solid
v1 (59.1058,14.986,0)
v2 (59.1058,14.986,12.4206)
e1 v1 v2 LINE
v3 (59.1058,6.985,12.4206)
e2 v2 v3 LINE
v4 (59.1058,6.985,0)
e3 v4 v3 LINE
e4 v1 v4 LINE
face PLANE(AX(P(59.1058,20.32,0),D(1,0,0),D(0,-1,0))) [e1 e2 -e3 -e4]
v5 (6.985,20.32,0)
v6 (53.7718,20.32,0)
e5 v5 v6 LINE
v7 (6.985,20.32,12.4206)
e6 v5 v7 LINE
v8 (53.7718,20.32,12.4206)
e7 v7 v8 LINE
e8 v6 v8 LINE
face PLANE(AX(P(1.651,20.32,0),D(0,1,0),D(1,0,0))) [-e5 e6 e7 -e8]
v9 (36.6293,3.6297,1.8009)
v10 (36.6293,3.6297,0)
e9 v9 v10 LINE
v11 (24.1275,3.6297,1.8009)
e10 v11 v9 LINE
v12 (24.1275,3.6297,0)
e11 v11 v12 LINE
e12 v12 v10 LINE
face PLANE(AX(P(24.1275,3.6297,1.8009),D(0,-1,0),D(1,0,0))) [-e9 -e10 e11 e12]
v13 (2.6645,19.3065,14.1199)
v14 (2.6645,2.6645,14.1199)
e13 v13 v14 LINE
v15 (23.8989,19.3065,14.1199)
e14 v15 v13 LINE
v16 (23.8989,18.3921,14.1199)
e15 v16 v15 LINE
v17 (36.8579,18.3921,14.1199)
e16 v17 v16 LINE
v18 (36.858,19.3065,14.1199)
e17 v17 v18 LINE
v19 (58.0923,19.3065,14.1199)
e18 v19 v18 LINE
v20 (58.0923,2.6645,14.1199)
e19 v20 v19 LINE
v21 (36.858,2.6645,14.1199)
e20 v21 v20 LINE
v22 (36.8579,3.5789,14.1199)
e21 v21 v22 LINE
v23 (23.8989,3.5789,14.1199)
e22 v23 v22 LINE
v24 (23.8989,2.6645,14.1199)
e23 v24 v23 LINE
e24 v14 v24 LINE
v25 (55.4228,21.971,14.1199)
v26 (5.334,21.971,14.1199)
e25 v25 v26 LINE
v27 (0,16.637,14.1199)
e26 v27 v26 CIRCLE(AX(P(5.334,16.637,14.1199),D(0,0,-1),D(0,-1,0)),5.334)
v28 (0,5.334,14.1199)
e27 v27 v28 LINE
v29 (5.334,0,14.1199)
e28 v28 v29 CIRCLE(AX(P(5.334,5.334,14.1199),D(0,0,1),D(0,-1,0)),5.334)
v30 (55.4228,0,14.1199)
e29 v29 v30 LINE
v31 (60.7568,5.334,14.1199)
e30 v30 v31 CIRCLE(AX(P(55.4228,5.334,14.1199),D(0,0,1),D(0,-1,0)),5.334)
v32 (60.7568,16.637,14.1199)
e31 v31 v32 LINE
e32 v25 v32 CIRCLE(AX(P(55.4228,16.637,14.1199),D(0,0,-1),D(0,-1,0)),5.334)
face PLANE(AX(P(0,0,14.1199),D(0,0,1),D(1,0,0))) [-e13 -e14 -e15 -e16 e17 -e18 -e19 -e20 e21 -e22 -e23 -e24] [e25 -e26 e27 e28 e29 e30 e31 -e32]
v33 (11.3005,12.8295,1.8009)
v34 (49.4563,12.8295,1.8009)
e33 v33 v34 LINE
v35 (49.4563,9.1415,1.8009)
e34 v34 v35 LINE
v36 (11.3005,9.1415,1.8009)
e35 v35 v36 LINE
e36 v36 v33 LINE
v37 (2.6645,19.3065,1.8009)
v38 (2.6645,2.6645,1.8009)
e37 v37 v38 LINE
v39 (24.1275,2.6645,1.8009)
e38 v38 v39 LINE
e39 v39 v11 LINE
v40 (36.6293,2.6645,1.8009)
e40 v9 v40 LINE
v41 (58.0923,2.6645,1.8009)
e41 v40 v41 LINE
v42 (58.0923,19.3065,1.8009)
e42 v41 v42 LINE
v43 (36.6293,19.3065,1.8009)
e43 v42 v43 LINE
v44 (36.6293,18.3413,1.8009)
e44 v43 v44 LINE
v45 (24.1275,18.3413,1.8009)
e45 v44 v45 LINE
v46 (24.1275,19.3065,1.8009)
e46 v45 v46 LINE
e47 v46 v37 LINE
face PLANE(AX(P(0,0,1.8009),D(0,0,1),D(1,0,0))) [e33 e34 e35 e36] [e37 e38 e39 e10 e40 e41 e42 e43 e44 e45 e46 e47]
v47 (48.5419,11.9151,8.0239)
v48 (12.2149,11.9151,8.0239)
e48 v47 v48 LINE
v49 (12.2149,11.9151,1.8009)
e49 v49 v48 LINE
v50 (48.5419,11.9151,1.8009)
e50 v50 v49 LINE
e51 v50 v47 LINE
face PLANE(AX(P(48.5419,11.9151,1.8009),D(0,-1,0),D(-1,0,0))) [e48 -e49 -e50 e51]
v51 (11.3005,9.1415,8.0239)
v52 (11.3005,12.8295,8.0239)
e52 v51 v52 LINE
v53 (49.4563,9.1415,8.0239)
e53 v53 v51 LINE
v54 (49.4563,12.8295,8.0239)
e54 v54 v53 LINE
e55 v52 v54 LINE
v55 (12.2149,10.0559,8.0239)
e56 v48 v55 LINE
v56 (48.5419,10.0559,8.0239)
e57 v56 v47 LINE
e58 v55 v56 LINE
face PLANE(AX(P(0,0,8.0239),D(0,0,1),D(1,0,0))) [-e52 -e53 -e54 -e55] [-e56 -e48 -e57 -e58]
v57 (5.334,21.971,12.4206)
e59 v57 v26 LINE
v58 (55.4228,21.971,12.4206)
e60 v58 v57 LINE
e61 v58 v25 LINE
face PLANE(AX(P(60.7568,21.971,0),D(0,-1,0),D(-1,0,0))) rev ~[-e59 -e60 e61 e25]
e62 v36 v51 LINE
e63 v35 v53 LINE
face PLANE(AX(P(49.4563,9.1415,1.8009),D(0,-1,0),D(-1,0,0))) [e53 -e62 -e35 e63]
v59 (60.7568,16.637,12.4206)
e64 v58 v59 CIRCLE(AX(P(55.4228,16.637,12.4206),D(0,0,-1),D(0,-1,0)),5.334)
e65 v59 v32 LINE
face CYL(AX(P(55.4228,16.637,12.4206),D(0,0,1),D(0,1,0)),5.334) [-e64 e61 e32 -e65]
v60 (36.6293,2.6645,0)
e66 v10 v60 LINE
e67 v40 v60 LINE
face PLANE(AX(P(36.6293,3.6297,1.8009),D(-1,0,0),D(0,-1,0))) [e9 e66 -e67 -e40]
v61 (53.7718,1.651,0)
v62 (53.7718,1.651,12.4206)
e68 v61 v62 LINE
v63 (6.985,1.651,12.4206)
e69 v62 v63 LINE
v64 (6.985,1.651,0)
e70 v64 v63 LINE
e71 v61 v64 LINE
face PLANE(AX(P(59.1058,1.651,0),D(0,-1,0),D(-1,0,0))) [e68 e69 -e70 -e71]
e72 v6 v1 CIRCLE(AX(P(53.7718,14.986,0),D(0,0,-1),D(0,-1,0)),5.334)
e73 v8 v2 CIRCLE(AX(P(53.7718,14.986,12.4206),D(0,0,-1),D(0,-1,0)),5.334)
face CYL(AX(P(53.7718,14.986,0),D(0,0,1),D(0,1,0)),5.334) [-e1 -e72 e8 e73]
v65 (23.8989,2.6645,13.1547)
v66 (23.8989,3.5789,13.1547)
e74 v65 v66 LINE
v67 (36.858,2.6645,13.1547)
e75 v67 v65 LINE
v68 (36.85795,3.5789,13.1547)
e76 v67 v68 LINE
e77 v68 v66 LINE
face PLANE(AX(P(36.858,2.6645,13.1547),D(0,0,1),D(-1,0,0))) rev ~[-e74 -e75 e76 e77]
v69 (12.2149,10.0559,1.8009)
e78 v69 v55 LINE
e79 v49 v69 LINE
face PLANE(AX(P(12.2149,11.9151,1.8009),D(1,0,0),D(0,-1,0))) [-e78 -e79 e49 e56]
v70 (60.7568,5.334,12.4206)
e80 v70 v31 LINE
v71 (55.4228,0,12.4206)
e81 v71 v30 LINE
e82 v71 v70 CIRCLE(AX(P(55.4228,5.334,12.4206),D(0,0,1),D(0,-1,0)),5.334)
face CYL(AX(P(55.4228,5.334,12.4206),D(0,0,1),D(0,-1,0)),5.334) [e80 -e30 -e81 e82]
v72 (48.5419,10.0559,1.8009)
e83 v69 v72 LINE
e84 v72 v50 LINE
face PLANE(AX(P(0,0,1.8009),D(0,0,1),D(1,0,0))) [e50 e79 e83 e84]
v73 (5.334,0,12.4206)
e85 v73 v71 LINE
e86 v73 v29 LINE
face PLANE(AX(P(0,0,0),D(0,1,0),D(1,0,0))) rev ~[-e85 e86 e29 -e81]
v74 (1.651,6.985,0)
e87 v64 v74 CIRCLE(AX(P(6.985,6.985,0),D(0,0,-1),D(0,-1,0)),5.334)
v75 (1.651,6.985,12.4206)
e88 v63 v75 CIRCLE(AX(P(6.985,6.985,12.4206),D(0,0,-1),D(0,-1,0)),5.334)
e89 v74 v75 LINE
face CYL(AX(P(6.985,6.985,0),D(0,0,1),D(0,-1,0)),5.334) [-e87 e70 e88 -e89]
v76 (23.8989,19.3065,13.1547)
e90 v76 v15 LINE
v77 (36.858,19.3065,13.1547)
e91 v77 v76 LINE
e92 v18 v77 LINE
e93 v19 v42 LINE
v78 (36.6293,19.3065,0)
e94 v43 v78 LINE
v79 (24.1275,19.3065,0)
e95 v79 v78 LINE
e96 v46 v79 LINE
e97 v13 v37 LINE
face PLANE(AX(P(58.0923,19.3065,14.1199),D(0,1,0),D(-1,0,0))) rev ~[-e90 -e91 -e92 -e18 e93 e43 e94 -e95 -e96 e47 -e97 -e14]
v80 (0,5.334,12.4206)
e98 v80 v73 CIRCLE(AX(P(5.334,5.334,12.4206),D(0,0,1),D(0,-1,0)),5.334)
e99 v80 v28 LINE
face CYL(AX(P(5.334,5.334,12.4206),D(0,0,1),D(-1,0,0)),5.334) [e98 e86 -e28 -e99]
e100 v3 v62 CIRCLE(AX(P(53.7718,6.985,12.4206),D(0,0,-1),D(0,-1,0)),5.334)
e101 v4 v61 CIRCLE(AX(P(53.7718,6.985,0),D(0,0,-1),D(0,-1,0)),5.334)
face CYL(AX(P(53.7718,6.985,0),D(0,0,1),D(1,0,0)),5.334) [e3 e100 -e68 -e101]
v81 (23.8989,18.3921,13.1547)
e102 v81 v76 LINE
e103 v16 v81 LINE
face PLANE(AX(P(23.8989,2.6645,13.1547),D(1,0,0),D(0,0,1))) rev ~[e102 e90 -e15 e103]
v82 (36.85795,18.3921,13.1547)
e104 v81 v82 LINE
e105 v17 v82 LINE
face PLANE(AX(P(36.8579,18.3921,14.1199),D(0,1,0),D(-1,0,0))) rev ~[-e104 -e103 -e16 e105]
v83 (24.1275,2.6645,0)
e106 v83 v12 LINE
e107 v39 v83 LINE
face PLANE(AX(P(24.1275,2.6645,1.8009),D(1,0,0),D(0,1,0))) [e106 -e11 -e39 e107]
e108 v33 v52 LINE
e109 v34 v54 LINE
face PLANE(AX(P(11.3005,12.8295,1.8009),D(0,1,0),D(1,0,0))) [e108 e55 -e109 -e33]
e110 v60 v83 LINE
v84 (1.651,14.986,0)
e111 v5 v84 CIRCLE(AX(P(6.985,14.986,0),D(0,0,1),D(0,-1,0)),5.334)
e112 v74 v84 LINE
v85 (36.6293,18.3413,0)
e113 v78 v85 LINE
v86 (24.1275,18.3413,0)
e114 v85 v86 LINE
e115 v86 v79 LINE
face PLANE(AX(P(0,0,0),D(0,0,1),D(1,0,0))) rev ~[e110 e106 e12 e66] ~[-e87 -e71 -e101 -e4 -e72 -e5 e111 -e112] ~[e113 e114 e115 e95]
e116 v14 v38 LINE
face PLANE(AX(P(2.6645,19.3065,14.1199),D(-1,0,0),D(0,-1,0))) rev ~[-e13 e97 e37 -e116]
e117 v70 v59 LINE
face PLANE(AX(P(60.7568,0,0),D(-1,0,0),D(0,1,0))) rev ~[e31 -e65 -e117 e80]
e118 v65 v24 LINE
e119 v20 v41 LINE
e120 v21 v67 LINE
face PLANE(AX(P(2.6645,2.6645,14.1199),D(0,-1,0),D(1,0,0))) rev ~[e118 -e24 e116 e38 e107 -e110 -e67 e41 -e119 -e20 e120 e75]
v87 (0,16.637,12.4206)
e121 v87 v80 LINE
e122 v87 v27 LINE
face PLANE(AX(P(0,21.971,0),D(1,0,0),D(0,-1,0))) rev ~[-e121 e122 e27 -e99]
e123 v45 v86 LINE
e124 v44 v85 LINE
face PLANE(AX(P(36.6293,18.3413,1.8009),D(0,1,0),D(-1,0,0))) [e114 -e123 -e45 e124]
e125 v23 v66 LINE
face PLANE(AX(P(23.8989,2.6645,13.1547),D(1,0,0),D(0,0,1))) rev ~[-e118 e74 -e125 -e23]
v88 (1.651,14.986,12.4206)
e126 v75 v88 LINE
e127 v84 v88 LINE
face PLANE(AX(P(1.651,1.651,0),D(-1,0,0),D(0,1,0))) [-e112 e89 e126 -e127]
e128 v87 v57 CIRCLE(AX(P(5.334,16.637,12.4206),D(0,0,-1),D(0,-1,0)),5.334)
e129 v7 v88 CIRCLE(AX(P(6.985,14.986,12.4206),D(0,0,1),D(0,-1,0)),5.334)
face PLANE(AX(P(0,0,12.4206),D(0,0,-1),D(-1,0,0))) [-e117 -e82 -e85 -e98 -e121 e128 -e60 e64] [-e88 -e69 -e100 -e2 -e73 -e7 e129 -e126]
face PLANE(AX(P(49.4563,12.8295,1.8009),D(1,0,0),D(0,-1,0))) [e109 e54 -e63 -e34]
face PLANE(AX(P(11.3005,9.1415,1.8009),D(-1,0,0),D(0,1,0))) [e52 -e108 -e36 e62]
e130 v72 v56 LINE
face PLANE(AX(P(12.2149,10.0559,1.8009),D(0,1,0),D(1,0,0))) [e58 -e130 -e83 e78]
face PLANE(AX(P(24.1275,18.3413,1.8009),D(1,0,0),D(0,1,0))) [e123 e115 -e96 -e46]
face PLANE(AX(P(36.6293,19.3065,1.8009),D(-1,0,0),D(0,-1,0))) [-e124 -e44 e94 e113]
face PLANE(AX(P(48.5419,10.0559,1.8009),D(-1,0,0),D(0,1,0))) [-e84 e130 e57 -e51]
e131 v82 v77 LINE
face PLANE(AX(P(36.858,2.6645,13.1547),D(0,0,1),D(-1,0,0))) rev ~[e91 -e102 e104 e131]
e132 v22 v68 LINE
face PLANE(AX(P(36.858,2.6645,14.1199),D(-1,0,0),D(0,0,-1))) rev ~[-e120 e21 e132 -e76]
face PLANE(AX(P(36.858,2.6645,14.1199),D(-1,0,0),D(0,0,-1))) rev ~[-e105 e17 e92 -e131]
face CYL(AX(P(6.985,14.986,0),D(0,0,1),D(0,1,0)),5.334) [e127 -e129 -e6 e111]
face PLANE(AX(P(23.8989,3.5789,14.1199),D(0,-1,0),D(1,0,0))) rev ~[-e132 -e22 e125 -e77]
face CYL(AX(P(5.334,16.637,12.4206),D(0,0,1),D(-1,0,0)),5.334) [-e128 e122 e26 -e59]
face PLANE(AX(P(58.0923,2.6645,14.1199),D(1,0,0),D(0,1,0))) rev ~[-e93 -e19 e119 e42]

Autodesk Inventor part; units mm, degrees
ref_plane "YZ Plane" through (0, 0, 0) normal (1, 0, 0) x (0, 1, 0)
ref_plane "XZ Plane" through (0, 0, 0) normal (0, 1, 0) x (-1, 0, 0)
ref_plane "XY Plane" through (0, 0, 0) normal (0, 0, 1) x (1, 0, 0)
sketch "Sketch1" plane through (0, 0, 0) normal (0, 0, 1) x (1, 0, 0)
  line L0 (0, 0) -> (60.7568, 0)
  line L1 (60.7568, 0) -> (60.7568, 21.971)
  line L2 (60.7568, 21.971) -> (0, 21.971)
  line L3 (0, 21.971) -> (0, 0)
  dimension "d0" = 60.7568
  dimension "d1" = 21.971
extrude "Extrusion1" add sketch "Sketch1" along normal blind 14.1199
sketch "Sketch2" plane through (0, 0, 14.1199) normal (0, 0, 1) x (1, 0, 0)
  line L0 (0, 21.971) -> (60.7568, 21.971) construction
  line L1 (60.7568, 21.971) -> (60.7568, 0) construction
  line L2 (60.7568, 0) -> (0, 0) construction
  line L3 (0, 0) -> (0, 21.971) construction
  line L4 (58.0923, 19.3065) -> (2.6645, 19.3065)
  line L5 (2.6645, 19.3065) -> (2.6645, 2.6645)
  line L6 (2.6645, 2.6645) -> (58.0923, 2.6645)
  line L7 (58.0923, 2.6645) -> (58.0923, 19.3065)
  point P0 (0, 0)
  dimension "d4" = 2.6645
extrude "Extrusion2" cut sketch "Sketch2" against normal blind 12.319
sketch "Sketch3" plane through (0, 0, 0) normal (0, 0, -1) x (-1, 0, 0)
  line L0 (-60.7568, 21.971) -> (0, 21.971)
  line L1 (0, 21.971) -> (0, 0)
  line L2 (0, 0) -> (-60.7568, 0)
  line L3 (-60.7568, 0) -> (-60.7568, 21.971)
  line L4 (-1.651, 20.32) -> (-59.1058, 20.32)
  line L5 (-59.1058, 20.32) -> (-59.1058, 1.651)
  line L6 (-59.1058, 1.651) -> (-1.651, 1.651)
  line L7 (-1.651, 1.651) -> (-1.651, 20.32)
  dimension "d7" = 1.651
extrude "Extrusion3" cut sketch "Sketch3" against normal blind 12.4206
fillet "Fillet1" radius 5.334 8 edges at (0, 21.971, 13.2702) (60.7568, 21.971, 13.2702) (60.7568, 0, 13.2702) (0, 0, 13.2702) (1.651, 20.32, 6.2103) (59.1058, 20.32, 6.2103) (59.1058, 1.651, 6.2103) (1.651, 1.651, 6.2103)
sketch "Sketch4" plane through (0, 0, 1.8009) normal (0, 0, 1) x (1, 0, 0)
  line L0 (11.3005, 12.8295) -> (49.4563, 12.8295)
  line L1 (49.4563, 12.8295) -> (49.4563, 9.1415)
  line L2 (49.4563, 9.1415) -> (11.3005, 9.1415)
  line L3 (11.3005, 9.1415) -> (11.3005, 12.8295)
  line L4 (2.6645, 2.6645) -> (2.6645, 19.3065) projected
  line L5 (58.0923, 19.3065) -> (58.0923, 2.6645) projected
  line L6 (2.6645, 19.3065) -> (58.0923, 19.3065) projected
  line L7 (58.0923, 2.6645) -> (2.6645, 2.6645) projected
  line L8 (48.5419, 11.9151) -> (12.2149, 11.9151)
  line L9 (12.2149, 11.9151) -> (12.2149, 10.0559)
  line L10 (12.2149, 10.0559) -> (48.5419, 10.0559)
  line L11 (48.5419, 10.0559) -> (48.5419, 11.9151)
  point P0 (0, 0)
  dimension "d12" = 8.636
  dimension "d13" = 8.636
  dimension "d14" = 6.477
  dimension "d15" = 6.477
  dimension "d16" = 0.9144
extrude "Extrusion4" add sketch "Sketch4" along normal blind 6.223 contours L0 L1 L2 L3
sketch "Sketch5" plane through (0, 0, 1.8009) normal (0, 0, 1) x (1, 0, 0)
  line L0 (58.0923, 2.6645) -> (2.6645, 2.6645) projected
  line L1 (24.1275, 3.6297) -> (36.6293, 3.6297)
  line L2 (36.6293, 3.6297) -> (36.6293, 2.6645)
  line L3 (36.6293, 2.6645) -> (24.1275, 2.6645)
  line L4 (24.1275, 2.6645) -> (24.1275, 3.6297)
  line L5 (2.6645, 19.3065) -> (58.0923, 19.3065) projected
  line L6 (24.1275, 19.3065) -> (36.6293, 19.3065)
  line L7 (36.6293, 19.3065) -> (36.6293, 18.3413)
  line L8 (36.6293, 18.3413) -> (24.1275, 18.3413)
  line L9 (24.1275, 18.3413) -> (24.1275, 19.3065)
  line L10 (2.6645, 2.6645) -> (2.6645, 19.3065) projected
  line L11 (58.0923, 19.3065) -> (58.0923, 2.6645) projected
  point P0 (0, 0)
  dimension "d19" = 21.463
  dimension "d20" = 21.463
  dimension "d21" = 21.463
  dimension "d22" = 21.463
  dimension "d23" = 0.9652
  dimension "d24" = 0.9652
extrude "Extrusion5" cut sketch "Sketch5" against normal blind 6.223 contours L0 L4 L1 L2 | L7 L8 L9 L5
sketch "Sketch6" plane through (2.6645, 2.6645, 14.1199) normal (0, 1, 0) x (1, 0, 0)
  line L0 (55.4279, 0) -> (0, 0) construction
  line L1 (21.2344, 0) -> (34.1935, 0)
  line L2 (34.1935, 0) -> (34.1935, 0.9652)
  line L3 (34.1935, 0.9652) -> (21.2344, 0.9652)
  line L4 (21.2344, 0.9652) -> (21.2344, 0)
  line L5 (0, 0) -> (0, 12.319) construction
  line L6 (55.4279, 0) -> (55.4279, 12.319) construction
  point P0 (-2.6645, 14.1199)
  dimension "d27" = 21.2344
  dimension "d28" = 21.2344
  dimension "d29" = 0.9652
extrude "Extrusion6" add sketch "Sketch6" along normal up to next
sketch "Sketch7" plane through (0, 0, 14.1199) normal (0, 0, 1) x (1, 0, 0)
  line L0 (23.8989, 2.6645) -> (23.8989, 19.3065) projected
  line L1 (36.8579, 2.6645) -> (36.8579, 19.3065) projected
  line L2 (23.8989, 3.5789) -> (36.8579, 3.5789)
  line L3 (36.8579, 3.5789) -> (36.8579, 18.3921)
  line L4 (36.8579, 18.3921) -> (23.8989, 18.3921)
  line L5 (23.8989, 18.3921) -> (23.8989, 3.5789)
  line L6 (36.8579, 19.3065) -> (58.0923, 19.3065) projected
  line L7 (58.0923, 2.6645) -> (36.8579, 2.6645) projected
  point P0 (0, 0)
  dimension "d32" = 0.9144
  dimension "d33" = 0.9144
extrude "Extrusion7" cut sketch "Sketch7" against normal up to next
equation "\"d13\" = d12"
equation "\"d15\" = d14"
equation "\"d20\" = d19"
equation "\"d21\" = d19"
equation "\"d22\" = d20"
equation "\"d24\" = d23"
equation "\"d28\" = d27"
equation "\"d33\" = d32"
properties part number "Socket(ellipse Insert)"
